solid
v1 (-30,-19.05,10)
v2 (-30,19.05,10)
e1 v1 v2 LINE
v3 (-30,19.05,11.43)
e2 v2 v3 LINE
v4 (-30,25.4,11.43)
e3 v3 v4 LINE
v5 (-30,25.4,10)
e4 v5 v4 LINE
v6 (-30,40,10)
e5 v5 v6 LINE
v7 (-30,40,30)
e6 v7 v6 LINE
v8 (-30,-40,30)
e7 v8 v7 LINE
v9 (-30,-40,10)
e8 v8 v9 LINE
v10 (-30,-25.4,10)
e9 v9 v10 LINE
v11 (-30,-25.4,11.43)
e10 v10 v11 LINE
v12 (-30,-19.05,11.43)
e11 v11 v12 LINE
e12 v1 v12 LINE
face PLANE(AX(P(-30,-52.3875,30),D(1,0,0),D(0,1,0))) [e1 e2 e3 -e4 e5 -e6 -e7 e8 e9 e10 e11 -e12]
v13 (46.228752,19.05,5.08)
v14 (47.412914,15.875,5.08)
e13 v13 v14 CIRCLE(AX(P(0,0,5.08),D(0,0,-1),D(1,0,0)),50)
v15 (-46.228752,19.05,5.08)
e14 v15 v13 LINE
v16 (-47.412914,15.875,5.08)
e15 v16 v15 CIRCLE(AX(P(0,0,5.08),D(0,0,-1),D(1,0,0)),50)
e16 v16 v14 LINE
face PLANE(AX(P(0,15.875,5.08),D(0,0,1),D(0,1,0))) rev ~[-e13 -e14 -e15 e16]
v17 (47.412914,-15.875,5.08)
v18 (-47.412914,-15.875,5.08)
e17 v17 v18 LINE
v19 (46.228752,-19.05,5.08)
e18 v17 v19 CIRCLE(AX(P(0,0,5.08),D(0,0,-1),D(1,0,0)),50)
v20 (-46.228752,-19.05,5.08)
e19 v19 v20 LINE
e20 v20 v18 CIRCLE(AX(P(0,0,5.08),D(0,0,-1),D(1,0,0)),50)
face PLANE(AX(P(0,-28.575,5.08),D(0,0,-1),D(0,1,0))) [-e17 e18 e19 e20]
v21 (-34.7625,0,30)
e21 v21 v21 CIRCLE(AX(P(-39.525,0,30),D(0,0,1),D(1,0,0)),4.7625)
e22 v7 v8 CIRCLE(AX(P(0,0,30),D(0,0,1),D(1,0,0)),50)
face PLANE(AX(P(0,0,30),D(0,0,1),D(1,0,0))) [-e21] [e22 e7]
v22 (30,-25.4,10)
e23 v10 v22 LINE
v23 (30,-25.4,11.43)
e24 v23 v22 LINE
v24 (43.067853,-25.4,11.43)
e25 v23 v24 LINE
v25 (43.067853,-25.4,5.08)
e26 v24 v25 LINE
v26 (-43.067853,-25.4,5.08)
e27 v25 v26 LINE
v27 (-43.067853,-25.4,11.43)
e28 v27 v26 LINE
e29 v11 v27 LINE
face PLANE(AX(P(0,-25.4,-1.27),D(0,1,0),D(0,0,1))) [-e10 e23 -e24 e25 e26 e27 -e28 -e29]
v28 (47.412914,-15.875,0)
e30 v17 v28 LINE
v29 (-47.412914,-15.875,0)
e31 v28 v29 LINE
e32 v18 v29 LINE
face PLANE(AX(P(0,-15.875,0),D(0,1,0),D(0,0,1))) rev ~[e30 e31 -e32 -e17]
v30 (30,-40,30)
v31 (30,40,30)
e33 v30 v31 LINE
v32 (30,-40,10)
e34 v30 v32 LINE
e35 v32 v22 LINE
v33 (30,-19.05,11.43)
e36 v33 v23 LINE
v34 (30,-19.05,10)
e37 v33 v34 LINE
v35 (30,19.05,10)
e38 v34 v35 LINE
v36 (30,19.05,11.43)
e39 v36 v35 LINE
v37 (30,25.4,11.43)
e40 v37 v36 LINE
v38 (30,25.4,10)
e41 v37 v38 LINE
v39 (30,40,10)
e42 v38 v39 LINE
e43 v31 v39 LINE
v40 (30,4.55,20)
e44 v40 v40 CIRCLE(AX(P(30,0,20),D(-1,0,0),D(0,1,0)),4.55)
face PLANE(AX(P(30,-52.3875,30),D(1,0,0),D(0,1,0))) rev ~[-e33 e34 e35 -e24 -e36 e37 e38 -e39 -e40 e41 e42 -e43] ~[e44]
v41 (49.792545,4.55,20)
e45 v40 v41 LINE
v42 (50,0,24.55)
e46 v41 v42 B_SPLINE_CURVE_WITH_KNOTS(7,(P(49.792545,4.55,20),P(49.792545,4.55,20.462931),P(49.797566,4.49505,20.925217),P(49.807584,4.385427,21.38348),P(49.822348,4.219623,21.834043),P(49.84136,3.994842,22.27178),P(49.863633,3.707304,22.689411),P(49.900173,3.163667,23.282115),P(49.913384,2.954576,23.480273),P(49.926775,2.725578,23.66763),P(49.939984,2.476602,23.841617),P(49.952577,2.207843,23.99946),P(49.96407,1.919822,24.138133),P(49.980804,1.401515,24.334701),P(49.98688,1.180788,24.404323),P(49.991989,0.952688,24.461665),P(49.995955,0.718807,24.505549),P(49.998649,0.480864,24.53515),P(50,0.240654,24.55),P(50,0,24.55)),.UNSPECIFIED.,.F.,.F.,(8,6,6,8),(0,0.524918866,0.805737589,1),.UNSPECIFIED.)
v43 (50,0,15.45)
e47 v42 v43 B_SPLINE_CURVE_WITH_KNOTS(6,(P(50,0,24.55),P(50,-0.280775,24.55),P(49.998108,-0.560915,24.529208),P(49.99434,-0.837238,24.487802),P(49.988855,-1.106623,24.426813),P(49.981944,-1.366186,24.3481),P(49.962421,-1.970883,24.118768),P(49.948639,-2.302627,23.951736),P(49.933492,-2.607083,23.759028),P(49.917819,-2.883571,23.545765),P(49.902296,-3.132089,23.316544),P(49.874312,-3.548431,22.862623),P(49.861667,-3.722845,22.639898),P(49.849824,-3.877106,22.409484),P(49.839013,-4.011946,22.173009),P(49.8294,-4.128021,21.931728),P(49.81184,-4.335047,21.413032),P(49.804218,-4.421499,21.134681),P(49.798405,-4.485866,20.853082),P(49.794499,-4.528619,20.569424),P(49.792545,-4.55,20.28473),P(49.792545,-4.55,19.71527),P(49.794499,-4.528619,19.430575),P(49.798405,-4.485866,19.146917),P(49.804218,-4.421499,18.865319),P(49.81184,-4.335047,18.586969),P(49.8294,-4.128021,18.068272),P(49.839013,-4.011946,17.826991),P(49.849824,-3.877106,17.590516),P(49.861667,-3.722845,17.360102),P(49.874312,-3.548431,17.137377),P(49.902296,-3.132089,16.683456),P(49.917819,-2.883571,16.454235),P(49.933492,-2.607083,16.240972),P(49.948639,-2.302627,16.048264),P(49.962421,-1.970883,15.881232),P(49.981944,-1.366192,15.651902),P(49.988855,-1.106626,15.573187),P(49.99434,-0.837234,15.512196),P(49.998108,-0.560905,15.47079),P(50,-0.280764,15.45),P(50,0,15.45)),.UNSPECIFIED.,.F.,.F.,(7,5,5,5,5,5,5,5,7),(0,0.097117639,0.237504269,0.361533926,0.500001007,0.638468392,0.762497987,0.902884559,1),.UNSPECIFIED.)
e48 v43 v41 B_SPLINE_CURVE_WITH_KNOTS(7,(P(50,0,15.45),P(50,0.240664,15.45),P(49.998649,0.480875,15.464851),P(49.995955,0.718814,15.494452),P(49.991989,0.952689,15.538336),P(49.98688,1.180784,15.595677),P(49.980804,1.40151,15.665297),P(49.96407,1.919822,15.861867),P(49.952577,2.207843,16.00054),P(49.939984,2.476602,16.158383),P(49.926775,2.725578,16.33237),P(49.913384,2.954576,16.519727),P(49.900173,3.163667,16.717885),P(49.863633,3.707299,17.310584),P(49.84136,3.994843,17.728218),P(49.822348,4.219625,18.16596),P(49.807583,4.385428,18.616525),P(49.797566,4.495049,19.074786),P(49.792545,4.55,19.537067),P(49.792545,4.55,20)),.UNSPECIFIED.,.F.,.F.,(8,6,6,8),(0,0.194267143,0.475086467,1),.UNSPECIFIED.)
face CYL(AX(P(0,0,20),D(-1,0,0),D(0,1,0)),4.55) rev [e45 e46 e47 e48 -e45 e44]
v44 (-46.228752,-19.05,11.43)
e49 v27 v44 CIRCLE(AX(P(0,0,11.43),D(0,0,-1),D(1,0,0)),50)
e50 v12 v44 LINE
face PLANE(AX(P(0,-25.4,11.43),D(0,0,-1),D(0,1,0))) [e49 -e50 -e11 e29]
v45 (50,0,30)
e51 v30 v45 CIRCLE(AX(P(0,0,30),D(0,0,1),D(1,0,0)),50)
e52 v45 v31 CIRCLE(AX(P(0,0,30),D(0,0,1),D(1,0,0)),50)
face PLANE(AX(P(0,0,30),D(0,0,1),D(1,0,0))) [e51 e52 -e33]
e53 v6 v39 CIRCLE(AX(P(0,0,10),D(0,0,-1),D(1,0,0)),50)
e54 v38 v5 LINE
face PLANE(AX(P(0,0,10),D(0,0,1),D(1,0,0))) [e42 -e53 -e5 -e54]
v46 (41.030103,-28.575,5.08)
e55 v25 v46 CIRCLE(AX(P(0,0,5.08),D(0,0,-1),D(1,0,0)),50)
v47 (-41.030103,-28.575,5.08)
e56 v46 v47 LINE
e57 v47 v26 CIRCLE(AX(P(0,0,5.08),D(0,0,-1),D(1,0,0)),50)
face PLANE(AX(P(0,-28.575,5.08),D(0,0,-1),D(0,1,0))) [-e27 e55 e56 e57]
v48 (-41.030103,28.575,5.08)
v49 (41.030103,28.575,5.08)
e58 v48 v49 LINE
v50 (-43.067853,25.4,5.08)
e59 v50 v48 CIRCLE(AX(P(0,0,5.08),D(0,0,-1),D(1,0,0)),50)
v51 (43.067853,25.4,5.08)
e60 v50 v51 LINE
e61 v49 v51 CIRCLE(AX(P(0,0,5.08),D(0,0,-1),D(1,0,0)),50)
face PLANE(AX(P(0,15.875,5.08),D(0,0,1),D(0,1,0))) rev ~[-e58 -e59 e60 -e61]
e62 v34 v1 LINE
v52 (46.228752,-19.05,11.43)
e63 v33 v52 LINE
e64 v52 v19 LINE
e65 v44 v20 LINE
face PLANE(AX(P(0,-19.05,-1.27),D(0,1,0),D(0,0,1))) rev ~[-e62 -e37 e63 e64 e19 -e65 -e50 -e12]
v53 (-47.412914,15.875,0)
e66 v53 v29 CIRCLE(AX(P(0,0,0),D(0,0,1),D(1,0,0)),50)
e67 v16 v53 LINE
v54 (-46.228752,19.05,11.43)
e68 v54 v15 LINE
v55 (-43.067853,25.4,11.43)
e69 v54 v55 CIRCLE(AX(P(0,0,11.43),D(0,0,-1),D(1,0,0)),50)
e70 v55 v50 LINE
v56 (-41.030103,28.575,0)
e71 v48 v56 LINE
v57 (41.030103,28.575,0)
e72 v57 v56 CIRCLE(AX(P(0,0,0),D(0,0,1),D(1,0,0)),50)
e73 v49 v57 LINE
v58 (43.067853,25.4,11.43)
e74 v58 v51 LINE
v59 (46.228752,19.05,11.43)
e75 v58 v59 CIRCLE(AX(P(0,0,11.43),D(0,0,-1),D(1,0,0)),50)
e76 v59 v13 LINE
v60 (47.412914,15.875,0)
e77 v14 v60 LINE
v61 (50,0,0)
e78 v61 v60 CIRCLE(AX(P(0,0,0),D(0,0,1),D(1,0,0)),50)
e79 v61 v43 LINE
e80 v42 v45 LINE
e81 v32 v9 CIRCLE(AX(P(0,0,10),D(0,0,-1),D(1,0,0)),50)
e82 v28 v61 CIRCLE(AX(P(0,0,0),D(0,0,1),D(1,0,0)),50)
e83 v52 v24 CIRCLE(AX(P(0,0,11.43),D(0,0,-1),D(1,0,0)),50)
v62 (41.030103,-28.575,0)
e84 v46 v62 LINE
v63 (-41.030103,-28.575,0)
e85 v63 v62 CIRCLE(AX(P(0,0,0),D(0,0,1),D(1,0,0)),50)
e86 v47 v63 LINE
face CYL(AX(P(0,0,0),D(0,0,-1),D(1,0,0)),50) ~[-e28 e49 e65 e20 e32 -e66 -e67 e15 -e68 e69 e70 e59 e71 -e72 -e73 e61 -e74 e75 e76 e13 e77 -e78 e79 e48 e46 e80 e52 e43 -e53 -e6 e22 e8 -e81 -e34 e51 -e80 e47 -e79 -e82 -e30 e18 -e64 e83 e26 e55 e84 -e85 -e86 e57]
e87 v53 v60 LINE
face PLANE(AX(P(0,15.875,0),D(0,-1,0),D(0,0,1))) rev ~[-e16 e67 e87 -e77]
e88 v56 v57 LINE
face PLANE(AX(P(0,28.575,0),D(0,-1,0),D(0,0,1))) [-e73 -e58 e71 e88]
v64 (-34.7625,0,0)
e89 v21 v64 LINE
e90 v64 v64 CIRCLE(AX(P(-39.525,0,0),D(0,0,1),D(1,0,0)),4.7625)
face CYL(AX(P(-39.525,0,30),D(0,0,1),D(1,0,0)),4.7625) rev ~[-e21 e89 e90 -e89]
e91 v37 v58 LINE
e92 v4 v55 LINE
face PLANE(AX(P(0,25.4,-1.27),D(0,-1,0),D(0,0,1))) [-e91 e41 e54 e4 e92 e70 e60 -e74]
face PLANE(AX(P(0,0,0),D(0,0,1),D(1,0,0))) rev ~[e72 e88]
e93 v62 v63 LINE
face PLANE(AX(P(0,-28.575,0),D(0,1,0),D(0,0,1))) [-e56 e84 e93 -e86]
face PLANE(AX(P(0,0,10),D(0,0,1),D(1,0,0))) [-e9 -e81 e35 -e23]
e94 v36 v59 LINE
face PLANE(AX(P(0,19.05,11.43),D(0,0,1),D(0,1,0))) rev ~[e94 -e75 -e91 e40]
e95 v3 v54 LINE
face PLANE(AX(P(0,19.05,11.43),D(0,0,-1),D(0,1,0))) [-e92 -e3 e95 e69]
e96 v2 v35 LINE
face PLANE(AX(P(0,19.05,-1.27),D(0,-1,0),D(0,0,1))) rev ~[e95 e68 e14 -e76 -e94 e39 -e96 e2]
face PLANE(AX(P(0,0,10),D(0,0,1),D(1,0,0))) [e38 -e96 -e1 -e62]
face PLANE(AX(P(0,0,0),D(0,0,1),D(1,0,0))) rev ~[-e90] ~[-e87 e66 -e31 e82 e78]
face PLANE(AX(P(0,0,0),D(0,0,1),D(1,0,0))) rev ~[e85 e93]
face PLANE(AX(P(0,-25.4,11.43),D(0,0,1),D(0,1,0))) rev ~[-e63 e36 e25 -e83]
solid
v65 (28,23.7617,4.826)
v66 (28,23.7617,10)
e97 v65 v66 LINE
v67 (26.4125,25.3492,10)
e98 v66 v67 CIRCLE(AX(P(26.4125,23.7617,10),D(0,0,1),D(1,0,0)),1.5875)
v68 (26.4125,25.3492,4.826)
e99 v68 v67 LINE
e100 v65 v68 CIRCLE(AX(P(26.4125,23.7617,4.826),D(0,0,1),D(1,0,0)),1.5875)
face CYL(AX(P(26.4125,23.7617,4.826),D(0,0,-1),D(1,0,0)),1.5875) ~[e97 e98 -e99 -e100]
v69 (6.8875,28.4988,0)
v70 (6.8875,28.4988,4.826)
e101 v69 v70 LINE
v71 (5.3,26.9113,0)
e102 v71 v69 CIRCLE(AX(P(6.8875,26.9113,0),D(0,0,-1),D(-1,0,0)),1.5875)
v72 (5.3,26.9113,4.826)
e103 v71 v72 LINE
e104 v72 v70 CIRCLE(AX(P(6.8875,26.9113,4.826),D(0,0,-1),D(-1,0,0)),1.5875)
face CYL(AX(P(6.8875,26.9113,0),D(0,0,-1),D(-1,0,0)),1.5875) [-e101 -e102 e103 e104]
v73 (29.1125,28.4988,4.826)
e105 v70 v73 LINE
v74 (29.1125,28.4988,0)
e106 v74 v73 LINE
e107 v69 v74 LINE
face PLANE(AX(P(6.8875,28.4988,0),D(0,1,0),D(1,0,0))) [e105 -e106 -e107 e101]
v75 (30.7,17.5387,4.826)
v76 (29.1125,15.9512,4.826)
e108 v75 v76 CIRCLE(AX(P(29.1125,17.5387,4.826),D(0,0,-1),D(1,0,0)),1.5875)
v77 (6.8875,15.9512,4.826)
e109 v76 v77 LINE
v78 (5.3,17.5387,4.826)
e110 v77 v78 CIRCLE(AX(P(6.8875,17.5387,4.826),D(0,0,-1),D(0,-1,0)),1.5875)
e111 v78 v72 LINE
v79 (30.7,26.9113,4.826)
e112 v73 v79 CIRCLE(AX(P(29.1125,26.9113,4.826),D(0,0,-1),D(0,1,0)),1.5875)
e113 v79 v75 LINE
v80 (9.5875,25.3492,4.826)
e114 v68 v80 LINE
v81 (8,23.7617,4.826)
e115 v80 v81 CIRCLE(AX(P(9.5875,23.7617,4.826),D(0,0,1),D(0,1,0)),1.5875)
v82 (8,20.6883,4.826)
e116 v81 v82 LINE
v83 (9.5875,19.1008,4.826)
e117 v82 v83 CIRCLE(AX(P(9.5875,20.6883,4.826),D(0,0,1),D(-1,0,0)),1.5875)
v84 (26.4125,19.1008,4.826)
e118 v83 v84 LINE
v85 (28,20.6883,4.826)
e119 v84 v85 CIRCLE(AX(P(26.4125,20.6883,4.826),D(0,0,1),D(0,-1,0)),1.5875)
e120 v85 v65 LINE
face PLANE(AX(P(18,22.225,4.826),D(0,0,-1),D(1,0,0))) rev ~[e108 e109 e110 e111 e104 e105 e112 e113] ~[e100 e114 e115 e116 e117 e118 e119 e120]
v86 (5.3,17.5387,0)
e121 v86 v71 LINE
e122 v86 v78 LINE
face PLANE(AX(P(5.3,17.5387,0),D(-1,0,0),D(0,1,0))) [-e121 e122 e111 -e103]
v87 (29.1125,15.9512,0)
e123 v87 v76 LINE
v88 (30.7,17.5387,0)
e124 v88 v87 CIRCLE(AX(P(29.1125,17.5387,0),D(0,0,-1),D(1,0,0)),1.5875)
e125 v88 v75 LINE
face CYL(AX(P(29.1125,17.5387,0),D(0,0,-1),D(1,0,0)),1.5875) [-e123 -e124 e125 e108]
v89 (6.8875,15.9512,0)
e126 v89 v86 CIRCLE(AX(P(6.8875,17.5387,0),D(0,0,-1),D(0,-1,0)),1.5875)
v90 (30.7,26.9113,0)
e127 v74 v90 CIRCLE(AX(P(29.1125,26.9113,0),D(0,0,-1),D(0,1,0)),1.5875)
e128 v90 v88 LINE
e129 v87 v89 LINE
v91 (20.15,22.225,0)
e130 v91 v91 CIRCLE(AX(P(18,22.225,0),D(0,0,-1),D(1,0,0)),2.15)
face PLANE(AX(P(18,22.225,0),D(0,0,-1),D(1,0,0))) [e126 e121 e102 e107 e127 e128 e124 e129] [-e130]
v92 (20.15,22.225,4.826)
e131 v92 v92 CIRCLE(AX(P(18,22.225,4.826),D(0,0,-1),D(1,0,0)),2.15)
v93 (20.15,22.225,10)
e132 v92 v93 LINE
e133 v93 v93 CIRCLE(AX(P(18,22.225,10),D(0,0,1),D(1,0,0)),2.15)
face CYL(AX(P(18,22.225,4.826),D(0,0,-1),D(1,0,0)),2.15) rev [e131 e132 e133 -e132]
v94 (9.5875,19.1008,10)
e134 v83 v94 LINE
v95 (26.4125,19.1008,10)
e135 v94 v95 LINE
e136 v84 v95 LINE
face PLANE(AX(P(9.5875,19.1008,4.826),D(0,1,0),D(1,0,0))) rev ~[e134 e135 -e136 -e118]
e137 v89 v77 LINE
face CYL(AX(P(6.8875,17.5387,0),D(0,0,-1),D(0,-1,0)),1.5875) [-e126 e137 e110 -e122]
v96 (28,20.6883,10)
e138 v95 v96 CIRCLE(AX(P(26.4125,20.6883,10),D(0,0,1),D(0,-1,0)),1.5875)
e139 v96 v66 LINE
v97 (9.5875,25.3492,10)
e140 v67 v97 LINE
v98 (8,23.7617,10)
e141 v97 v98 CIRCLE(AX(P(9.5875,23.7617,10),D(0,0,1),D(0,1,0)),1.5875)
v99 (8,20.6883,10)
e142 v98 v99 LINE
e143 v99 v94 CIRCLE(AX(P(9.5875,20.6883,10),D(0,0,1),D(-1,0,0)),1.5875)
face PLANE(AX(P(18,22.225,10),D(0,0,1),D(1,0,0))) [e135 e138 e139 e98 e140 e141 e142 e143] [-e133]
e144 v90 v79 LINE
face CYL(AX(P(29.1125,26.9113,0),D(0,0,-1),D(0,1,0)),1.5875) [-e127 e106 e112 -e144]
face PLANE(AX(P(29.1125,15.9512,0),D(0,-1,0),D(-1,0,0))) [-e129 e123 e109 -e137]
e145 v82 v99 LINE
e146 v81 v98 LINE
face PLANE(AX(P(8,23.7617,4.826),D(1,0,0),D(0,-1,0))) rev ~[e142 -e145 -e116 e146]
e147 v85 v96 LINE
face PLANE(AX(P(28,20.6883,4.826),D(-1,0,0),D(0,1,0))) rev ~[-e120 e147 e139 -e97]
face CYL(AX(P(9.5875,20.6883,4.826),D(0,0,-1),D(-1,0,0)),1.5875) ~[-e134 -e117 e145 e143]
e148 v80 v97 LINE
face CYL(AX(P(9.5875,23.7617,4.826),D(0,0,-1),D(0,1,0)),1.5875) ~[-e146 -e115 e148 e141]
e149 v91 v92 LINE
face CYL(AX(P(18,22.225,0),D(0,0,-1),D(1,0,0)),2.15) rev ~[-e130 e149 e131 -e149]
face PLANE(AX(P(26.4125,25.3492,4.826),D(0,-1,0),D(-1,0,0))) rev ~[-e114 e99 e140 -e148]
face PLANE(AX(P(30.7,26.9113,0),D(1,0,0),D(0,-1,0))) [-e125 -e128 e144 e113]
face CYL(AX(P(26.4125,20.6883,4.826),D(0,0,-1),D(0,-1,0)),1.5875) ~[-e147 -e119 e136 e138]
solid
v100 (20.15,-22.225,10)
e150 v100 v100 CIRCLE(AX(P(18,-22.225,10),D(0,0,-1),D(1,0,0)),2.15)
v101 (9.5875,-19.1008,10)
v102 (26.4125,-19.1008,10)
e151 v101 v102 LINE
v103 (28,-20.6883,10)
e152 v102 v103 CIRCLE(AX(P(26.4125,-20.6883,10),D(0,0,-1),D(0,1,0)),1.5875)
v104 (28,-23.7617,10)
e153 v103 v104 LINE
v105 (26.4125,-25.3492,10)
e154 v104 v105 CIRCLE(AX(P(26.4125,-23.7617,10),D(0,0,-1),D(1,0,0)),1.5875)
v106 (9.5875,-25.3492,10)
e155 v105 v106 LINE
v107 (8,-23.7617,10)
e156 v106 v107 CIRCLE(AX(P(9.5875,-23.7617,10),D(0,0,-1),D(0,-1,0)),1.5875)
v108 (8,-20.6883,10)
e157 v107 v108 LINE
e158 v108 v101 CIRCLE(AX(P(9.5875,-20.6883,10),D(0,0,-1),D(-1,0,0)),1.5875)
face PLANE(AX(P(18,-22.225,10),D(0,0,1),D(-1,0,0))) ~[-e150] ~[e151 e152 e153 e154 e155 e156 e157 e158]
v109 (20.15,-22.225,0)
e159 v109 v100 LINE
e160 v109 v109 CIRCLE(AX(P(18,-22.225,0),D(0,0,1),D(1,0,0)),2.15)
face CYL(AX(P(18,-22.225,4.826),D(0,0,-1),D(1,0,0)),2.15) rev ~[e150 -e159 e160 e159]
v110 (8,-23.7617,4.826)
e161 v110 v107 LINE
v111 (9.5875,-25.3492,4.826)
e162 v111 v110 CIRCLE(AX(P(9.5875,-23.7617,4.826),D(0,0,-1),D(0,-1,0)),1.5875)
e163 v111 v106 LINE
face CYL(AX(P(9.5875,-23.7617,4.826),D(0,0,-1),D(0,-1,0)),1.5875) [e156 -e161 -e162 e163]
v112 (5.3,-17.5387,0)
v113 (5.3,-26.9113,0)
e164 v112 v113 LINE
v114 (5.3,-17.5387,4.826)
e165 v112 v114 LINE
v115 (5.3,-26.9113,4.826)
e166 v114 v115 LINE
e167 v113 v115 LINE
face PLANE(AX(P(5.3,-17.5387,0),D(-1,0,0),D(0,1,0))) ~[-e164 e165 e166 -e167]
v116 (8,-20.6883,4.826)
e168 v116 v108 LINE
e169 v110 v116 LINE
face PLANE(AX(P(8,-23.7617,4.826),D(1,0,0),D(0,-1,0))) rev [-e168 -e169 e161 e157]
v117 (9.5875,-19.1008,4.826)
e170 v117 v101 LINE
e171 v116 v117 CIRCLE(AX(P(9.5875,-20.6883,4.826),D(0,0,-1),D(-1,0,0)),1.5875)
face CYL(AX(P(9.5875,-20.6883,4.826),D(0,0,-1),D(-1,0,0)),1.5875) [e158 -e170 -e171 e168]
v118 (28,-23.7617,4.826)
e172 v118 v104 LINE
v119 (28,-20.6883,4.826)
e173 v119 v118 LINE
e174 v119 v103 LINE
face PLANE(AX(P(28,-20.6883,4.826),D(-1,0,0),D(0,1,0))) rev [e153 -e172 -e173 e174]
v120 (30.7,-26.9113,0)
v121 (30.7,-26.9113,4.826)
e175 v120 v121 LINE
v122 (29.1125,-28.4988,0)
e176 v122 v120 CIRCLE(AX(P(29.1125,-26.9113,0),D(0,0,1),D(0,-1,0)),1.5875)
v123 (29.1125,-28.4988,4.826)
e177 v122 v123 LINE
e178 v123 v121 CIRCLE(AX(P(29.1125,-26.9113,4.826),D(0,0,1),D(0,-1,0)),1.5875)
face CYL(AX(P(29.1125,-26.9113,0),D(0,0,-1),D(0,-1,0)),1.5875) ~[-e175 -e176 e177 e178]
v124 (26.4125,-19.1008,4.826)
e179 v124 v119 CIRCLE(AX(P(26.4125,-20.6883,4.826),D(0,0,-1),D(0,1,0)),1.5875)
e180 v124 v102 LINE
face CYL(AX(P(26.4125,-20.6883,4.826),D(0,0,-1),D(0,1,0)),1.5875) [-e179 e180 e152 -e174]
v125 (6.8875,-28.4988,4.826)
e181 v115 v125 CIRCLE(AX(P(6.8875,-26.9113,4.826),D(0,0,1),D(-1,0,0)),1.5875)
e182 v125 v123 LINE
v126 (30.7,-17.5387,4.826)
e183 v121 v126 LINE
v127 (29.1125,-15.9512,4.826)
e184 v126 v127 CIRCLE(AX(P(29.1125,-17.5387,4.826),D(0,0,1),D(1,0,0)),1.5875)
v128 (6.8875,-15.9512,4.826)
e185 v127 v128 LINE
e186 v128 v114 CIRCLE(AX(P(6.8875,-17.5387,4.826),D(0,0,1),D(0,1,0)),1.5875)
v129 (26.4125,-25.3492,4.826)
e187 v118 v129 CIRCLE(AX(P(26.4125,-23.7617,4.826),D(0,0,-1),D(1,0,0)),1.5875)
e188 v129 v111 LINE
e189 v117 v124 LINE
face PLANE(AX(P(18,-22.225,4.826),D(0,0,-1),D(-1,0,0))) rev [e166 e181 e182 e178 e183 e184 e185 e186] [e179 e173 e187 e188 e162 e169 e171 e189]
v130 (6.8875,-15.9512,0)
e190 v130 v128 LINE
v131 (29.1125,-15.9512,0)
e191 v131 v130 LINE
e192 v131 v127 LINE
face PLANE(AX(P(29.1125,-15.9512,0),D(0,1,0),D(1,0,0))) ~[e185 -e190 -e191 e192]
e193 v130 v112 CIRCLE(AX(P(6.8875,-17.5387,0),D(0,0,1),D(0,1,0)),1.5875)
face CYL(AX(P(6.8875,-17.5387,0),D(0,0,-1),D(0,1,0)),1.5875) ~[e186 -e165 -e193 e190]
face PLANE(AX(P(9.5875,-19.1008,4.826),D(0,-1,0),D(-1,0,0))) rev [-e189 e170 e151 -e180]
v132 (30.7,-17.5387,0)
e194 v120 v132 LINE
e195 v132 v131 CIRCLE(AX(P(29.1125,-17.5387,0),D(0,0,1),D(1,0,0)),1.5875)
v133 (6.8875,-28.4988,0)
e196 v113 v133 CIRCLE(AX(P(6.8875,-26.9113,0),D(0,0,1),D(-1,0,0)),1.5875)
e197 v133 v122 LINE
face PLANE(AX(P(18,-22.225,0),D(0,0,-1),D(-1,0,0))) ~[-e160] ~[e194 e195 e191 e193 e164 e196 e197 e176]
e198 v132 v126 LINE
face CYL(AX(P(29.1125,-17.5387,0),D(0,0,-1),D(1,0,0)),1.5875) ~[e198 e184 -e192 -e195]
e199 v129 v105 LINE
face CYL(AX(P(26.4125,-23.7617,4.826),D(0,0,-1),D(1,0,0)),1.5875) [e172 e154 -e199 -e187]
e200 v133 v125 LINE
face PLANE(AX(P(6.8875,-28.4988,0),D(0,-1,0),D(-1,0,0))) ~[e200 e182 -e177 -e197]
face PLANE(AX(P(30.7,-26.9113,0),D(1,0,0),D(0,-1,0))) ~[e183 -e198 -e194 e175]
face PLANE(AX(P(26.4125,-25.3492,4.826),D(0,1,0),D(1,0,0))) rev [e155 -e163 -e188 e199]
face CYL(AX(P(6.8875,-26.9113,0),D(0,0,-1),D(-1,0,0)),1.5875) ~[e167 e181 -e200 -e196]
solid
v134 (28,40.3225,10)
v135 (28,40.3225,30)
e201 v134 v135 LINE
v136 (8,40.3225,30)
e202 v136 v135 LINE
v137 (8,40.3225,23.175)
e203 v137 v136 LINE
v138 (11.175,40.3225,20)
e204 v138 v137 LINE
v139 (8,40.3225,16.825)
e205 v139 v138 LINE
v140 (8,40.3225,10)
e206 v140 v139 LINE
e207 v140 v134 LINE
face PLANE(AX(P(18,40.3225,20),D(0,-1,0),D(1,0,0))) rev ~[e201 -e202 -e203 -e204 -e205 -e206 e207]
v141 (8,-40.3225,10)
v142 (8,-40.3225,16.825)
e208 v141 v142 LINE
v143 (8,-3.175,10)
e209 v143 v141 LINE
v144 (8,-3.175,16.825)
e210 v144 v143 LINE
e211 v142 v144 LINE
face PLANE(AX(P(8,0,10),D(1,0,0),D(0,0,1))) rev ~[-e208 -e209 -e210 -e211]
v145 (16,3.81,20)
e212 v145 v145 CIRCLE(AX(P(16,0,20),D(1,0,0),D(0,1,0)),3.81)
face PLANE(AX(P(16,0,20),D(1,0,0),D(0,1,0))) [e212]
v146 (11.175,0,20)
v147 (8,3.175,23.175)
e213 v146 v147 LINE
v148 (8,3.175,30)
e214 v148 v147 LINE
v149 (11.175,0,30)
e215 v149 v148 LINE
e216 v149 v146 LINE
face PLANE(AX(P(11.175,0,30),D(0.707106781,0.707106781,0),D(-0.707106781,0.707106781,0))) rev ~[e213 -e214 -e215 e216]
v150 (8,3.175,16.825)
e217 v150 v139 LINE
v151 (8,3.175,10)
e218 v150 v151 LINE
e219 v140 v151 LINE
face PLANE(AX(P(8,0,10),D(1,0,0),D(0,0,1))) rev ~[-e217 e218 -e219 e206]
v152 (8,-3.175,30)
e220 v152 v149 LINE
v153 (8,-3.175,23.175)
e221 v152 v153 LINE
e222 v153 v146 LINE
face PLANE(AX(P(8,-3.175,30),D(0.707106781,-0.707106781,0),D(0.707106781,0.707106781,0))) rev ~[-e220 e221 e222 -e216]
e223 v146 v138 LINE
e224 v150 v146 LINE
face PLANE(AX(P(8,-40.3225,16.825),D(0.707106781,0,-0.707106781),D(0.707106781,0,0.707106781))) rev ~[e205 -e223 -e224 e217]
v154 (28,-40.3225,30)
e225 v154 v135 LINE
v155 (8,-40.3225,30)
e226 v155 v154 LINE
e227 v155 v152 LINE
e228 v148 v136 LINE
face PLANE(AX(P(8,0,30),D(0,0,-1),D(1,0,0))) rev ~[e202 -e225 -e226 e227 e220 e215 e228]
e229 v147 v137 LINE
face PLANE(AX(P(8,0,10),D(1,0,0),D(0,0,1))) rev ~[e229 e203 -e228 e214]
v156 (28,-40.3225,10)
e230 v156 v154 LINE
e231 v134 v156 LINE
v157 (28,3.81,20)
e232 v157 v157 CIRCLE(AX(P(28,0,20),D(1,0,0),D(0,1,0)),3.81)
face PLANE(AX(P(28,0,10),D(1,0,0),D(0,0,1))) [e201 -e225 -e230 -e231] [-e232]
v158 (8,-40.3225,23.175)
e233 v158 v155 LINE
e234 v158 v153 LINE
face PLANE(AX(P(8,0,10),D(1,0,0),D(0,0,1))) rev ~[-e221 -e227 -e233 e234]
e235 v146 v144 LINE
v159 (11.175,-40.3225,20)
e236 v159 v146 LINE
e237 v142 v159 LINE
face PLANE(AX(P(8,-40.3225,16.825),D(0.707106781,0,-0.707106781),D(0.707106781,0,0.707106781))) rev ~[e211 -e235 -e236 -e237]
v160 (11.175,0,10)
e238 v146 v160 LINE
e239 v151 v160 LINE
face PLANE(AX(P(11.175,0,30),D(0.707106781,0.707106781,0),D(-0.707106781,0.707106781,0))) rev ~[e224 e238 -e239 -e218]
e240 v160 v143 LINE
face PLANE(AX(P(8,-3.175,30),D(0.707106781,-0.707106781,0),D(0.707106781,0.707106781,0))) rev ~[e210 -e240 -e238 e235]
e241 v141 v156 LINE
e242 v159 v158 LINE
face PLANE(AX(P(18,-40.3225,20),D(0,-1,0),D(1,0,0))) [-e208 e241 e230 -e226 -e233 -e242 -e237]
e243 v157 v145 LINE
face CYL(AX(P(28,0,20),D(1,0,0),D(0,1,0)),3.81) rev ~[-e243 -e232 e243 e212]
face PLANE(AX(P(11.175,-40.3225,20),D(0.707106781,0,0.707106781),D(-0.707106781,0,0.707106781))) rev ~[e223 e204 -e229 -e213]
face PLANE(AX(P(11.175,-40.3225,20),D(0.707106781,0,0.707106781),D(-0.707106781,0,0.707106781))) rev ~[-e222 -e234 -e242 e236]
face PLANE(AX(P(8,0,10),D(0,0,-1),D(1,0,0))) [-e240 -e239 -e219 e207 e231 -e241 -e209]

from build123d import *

# Parameters (mm, degrees)
F0_R          = 50
F1_DEPTH      = 30
F2_W          = 60
F2_H          = 104.775
F3_DEPTH      = 20
F4_W          = 12.7
F4_H          = 5.08
F5_DEPTH      = 50.001
F5_DEPTH_BACK = 50.001
F6_W          = 6.35
F6_H          = 12.7
F7_DEPTH      = 50.001
F7_DEPTH_BACK = 50.001
F8_R          = 4.55
F9_DEPTH      = 50.001
F10_R         = 2.15
F11_DEPTH     = 4.826
F12_R         = 2.15
F13_DEPTH     = 5.174
F15_W         = 20
F15_H         = 20
F16_DEPTH     = 40.3225
F17_R         = 3.81
F18_DEPTH     = 12
F20_DEPTH     = 90.3235001
F22_DEPTH     = 30.0010001
F23_R         = 4.7625
F24_DEPTH     = 30.0010001


with BuildPart() as f1:
    # F0 (on Top) → F1 (new body)
    with BuildSketch(Plane.XY):
        Circle(F0_R)
    extrude(amount=F1_DEPTH)

    # F2 (on face) → F3 (cut)
    with BuildSketch(Plane.XY.offset(30)):
        Rectangle(F2_W, F2_H)
    extrude(amount=-F3_DEPTH, mode=Mode.SUBTRACT)

    # F4 (on Right) → F5 (cut, two sides)
    with BuildSketch(Plane.YZ) as f5_sk:
        with Locations((-22.225, 2.54)):
            Rectangle(F4_W, F4_H)
        with Locations((22.225, 2.54)):
            Rectangle(F4_W, F4_H)
    extrude(amount=-F5_DEPTH, mode=Mode.SUBTRACT)
    extrude(f5_sk.sketch, amount=F5_DEPTH_BACK, mode=Mode.SUBTRACT)

    # F6 (on Right) → F7 (cut, two sides)
    with BuildSketch(Plane.YZ) as f7_sk:
        with Locations((-22.225, 5.08)):
            Rectangle(F6_W, F6_H)
        with Locations((22.225, 5.08)):
            Rectangle(F6_W, F6_H)
    extrude(amount=-F7_DEPTH, mode=Mode.SUBTRACT)
    extrude(f7_sk.sketch, amount=F7_DEPTH_BACK, mode=Mode.SUBTRACT)

    # F8 (on Right) → F9 (cut, through all)
    with BuildSketch(Plane.YZ):
        with Locations((0, 20)):
            Circle(F8_R)
    extrude(amount=F9_DEPTH, mode=Mode.SUBTRACT)

    # F23 (on face) → F24 (cut, through all)
    with BuildSketch(Plane.XY.offset(30)):
        with Locations((-39.525, 0)):
            Circle(F23_R)
    extrude(amount=-F24_DEPTH, mode=Mode.SUBTRACT)


with BuildPart() as f11:
    # F10 (on face) → F11 (new body)
    with BuildSketch(Plane(origin=(0, 0, 0), x_dir=(1, 0, 0), z_dir=(0, 0, -1))):
        with BuildLine():
            Line((6.8875, -28.4988), (29.1125, -28.4988))
            ThreePointArc((29.1125, -28.4988), (30.2350320151, -28.0338320151), (30.7, -26.9113))
            Line((30.7, -26.9113), (30.7, -17.5387))
            ThreePointArc((30.7, -17.5387), (30.2350320151, -16.4161679849), (29.1125, -15.9512))
            Line((29.1125, -15.9512), (6.8875, -15.9512))
            ThreePointArc((6.8875, -15.9512), (5.7649679849, -16.4161679849), (5.3, -17.5387))
            Line((5.3, -17.5387), (5.3, -26.9113))
            ThreePointArc((5.3, -26.9113), (5.7649679849, -28.0338320151), (6.8875, -28.4988))
        make_face()
        with Locations((18, -22.225)):
            Circle(F10_R, mode=Mode.SUBTRACT)
    extrude(amount=-F11_DEPTH)

    # F12 (on face) → F13 (join, through all)
    with BuildSketch(Plane.XY.offset(4.826)):
        with BuildLine():
            ThreePointArc((8, 20.6883), (8.4649679849, 19.5657679849), (9.5875, 19.1008))
            Line((9.5875, 19.1008), (26.4125, 19.1008))
            ThreePointArc((26.4125, 19.1008), (27.5350320151, 19.5657679849), (28, 20.6883))
            Line((28, 20.6883), (28, 23.7617))
            ThreePointArc((28, 23.7617), (27.5350320151, 24.8842320151), (26.4125, 25.3492))
            Line((26.4125, 25.3492), (9.5875, 25.3492))
            ThreePointArc((9.5875, 25.3492), (8.4649679849, 24.8842320151), (8, 23.7617))
            Line((8, 23.7617), (8, 20.6883))
        make_face()
        with Locations((18, 22.225)):
            Circle(F12_R, mode=Mode.SUBTRACT)
    extrude(amount=F13_DEPTH)


with BuildPart() as f14_1:
    # F14: instance of F11
    add(f11.part.mirror(Plane.XZ))


with BuildPart() as f16:
    # F15 (on Front) → F16 (new body, symmetric)
    with BuildSketch(Plane.XZ):
        with Locations((18, 20)):
            Rectangle(F15_W, F15_H)
    extrude(amount=F16_DEPTH, both=True)

    # F17 (on face) → F18 (cut)
    with BuildSketch(Plane.YZ.offset(28)):
        with Locations((0, 20)):
            Circle(F17_R)
    extrude(amount=-F18_DEPTH, mode=Mode.SUBTRACT)

    # F19 (on face) → F20 (cut, through all)
    with BuildSketch(Plane.XZ.offset(40.3225)):
        Polygon((8, 23.175), (8, 16.825), (11.175, 20), align=None)
    extrude(amount=-F20_DEPTH, mode=Mode.SUBTRACT)

    # F21 (on face) → F22 (cut, through all)
    with BuildSketch(Plane.XY.offset(30)):
        Polygon((11.175, 0), (8, 3.175), (8, -3.175), align=None)
    extrude(amount=-F22_DEPTH, mode=Mode.SUBTRACT)


solid = Compound([f1.part, f11.part, f14_1.part, f16.part])
